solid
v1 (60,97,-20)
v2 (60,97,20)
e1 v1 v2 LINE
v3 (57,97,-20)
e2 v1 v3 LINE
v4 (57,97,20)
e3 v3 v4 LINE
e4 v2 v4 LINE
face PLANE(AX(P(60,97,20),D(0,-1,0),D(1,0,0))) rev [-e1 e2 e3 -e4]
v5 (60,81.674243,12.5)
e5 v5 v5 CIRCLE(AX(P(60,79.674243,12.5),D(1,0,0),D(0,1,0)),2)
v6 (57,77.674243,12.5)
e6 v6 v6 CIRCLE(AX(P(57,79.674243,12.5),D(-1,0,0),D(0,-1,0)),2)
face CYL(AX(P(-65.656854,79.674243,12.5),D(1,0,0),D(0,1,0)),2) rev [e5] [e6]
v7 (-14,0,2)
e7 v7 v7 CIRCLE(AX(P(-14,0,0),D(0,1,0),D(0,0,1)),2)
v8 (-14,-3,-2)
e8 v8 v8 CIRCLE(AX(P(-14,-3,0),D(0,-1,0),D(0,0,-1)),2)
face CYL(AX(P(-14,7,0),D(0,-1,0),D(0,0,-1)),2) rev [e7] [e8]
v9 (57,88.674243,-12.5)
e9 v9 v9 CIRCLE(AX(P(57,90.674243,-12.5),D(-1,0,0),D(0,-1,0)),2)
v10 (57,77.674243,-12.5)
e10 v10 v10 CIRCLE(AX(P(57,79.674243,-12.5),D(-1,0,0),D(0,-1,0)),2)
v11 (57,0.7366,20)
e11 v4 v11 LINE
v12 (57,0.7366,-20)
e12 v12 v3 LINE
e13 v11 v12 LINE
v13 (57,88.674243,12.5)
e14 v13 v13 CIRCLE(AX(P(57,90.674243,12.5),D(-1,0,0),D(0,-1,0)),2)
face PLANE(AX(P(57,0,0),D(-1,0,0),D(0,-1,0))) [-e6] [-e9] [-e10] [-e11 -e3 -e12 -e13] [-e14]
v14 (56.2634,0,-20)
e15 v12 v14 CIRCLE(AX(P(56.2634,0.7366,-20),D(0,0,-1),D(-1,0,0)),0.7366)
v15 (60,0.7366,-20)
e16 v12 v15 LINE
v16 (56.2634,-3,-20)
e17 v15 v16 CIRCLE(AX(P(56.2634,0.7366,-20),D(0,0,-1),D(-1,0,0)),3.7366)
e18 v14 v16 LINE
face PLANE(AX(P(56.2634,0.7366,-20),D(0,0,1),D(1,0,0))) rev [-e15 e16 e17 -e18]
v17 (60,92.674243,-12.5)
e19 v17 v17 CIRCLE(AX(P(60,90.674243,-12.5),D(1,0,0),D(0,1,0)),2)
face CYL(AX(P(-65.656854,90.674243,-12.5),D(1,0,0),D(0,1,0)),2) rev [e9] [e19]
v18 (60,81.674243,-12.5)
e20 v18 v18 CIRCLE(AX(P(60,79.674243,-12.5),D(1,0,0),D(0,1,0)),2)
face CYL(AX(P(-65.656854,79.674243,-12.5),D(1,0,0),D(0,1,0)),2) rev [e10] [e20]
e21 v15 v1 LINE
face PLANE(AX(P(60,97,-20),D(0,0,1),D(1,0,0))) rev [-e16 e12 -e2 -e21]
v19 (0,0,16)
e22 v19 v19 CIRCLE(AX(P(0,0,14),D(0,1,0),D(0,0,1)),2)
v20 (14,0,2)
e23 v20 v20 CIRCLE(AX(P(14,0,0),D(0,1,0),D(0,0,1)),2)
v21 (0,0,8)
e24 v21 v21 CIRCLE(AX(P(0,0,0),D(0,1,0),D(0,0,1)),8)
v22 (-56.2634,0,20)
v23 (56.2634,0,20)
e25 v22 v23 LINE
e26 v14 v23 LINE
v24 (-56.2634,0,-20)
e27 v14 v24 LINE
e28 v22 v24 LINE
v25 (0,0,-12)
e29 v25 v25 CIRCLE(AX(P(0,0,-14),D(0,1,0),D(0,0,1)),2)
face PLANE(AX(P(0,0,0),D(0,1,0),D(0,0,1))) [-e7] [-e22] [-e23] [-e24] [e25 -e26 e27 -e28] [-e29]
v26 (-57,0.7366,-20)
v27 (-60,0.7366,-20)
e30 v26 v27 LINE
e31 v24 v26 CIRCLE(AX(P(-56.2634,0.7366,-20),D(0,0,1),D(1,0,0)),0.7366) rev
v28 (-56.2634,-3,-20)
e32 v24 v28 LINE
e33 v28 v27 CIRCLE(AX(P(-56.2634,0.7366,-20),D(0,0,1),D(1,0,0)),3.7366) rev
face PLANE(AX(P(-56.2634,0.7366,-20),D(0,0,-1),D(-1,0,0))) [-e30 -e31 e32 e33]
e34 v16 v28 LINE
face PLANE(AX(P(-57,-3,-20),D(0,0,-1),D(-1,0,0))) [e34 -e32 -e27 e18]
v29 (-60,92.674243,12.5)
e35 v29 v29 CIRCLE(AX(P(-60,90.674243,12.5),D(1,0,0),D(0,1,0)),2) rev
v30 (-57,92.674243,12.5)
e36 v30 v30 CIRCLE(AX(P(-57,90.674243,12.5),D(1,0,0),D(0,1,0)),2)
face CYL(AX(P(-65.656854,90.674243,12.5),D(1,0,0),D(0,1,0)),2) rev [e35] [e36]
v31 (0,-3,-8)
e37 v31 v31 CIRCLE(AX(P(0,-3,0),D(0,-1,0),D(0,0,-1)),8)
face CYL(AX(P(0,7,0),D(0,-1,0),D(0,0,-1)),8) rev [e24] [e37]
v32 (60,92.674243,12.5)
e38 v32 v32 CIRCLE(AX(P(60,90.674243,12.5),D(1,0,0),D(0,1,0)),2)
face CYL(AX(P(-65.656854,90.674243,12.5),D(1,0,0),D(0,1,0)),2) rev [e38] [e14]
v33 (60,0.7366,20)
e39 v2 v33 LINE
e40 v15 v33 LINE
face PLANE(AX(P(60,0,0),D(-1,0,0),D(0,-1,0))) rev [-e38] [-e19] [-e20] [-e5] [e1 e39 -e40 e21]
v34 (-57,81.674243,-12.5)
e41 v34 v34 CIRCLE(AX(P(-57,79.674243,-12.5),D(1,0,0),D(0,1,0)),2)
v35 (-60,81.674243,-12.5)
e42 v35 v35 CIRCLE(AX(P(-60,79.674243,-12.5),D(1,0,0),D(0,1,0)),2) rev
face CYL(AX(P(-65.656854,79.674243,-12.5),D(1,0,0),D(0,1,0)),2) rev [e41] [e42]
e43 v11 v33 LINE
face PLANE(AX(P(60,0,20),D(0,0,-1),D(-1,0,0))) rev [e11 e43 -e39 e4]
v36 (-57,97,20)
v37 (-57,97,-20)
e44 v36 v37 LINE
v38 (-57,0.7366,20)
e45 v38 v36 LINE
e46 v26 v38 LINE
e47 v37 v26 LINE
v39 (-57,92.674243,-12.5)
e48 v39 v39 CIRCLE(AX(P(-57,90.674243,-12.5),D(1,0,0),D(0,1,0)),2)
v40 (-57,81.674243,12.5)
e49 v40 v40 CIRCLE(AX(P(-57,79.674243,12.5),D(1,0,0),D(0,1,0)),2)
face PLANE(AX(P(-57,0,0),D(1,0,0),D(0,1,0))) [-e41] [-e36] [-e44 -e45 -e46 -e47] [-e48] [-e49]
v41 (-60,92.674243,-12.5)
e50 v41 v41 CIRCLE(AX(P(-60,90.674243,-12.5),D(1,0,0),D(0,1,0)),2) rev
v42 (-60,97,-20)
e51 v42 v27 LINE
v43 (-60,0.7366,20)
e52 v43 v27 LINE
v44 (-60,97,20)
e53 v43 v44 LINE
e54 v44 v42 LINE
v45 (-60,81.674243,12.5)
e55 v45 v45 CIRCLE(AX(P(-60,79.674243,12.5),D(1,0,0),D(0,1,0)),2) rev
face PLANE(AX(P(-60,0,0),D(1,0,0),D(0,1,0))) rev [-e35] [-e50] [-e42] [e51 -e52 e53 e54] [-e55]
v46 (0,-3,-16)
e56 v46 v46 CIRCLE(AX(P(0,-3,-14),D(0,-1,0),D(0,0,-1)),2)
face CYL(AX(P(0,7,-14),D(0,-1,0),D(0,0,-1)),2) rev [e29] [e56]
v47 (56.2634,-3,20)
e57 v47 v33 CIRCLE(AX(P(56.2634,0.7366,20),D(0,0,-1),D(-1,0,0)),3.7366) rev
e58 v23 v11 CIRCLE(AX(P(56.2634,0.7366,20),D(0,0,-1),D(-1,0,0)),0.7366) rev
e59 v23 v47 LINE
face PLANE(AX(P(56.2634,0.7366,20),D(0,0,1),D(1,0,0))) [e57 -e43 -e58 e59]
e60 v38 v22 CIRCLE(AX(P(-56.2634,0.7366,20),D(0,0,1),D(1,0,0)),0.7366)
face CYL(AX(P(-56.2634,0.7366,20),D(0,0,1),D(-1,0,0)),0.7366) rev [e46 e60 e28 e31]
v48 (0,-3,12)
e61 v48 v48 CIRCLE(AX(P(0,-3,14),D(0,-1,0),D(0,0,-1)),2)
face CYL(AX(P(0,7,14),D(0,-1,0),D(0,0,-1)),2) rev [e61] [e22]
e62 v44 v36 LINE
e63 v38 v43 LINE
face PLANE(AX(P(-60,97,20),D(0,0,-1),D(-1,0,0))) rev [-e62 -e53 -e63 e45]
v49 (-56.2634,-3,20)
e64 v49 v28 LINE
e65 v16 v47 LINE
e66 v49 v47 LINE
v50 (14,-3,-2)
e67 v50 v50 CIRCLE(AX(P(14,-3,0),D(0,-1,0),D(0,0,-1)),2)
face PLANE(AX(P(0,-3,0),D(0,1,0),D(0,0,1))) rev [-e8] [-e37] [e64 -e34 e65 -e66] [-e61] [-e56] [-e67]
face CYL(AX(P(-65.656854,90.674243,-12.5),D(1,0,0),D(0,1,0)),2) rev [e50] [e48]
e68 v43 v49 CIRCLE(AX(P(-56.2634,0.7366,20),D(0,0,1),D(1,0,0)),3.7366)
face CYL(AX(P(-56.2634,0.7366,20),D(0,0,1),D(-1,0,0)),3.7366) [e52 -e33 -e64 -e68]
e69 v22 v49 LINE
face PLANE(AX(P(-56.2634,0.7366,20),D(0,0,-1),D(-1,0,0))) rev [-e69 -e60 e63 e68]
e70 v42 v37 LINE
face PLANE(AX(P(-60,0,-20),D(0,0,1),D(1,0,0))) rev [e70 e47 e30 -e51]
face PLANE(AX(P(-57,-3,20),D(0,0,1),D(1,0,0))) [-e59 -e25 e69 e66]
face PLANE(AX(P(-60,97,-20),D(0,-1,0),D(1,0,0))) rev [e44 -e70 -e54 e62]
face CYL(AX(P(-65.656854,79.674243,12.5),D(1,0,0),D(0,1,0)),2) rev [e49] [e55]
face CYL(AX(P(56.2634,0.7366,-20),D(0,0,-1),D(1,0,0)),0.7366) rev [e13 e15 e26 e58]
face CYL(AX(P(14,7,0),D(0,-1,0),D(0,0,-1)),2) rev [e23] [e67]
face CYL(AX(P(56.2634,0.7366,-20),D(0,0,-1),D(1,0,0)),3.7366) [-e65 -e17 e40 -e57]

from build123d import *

# Parameters (mm, degrees)
SKETCH3_W                    = 114
SKETCH3_H                    = 40
BASE_FLANGE1_DEPTH           = 3
EDGE_FLANGE1_STRIP_W         = 13.4732
EDGE_FLANGE1_STRIP_H         = 3
EDGE_FLANGE1_STRIP_CUT_DEPTH = 40
EDGE_FLANGE1_DEPTH           = 40
EDGE_FLANGE2_STRIP_W         = 13.4732
EDGE_FLANGE2_STRIP_H         = 3
EDGE_FLANGE2_STRIP_CUT_DEPTH = 40
EDGE_FLANGE2_DEPTH           = 40
SKETCH11_R                   = 8
SKETCH11_R_2                 = 2
CUT_EXTRUDE1_DEPTH           = 10
CUT_EXTRUDE2_REACH           = 157.592
SKETCH12_R                   = 2


# Sheet-metal steps are written as plain solids
with BuildPart() as part:
    # Sketch3 → Base-Flange1 (new body)
    with BuildSketch(Plane(origin=(0, 0, 0), x_dir=(1, 0, 0), z_dir=(0, 1, 0))):
        Rectangle(SKETCH3_W, SKETCH3_H)
    extrude(amount=-BASE_FLANGE1_DEPTH)

    # Edge-Flange1 strip (across the edge) → Edge-Flange1 strip cut (cut)
    with BuildSketch(Plane(origin=(-57, 0, -20), x_dir=(1, 0, 0), z_dir=(0, 0, 1))):
        with Locations((-6, -1.5)):
            Rectangle(EDGE_FLANGE1_STRIP_W, EDGE_FLANGE1_STRIP_H)
    extrude(amount=EDGE_FLANGE1_STRIP_CUT_DEPTH, mode=Mode.SUBTRACT)

    # Edge-Flange1 section (across the edge) → Edge-Flange1 (add)
    with BuildSketch(Plane(origin=(-57, 0, -20), x_dir=(1, 0, 0), z_dir=(0, 0, 1))):
        with BuildLine():
            Line((-3, 0.7366), (-3, 97))
            Line((-3, 97), (0, 97))
            Line((0, 97), (0, 0.7366))
            ThreePointArc((0, 0.7366), (0.215745145, 0.215745145), (0.7366, 0))
            Line((0.7366, 0), (0.7366, -3))
            ThreePointArc((0.7366, -3), (-1.905575199, -1.905575199), (-3, 0.7366))
        make_face()
    extrude(amount=EDGE_FLANGE1_DEPTH)

    # Edge-Flange2 strip (across the edge) → Edge-Flange2 strip cut (cut)
    with BuildSketch(Plane(origin=(57, 0, 20), x_dir=(-1, 0, 0), z_dir=(0, 0, -1))):
        with Locations((-6, -1.5)):
            Rectangle(EDGE_FLANGE2_STRIP_W, EDGE_FLANGE2_STRIP_H)
    extrude(amount=EDGE_FLANGE2_STRIP_CUT_DEPTH, mode=Mode.SUBTRACT)

    # Edge-Flange2 section (across the edge) → Edge-Flange2 (add)
    with BuildSketch(Plane(origin=(57, 0, 20), x_dir=(-1, 0, 0), z_dir=(0, 0, -1))):
        with BuildLine():
            Line((-3, 0.7366), (-3, 97))
            Line((-3, 97), (0, 97))
            Line((0, 97), (0, 0.7366))
            ThreePointArc((0, 0.7366), (0.215745145, 0.215745145), (0.7366, 0))
            Line((0.7366, 0), (0.7366, -3))
            ThreePointArc((0.7366, -3), (-1.905575199, -1.905575199), (-3, 0.7366))
        make_face()
    extrude(amount=EDGE_FLANGE2_DEPTH)

    # Sketch11 → Cut-Extrude1 (cut)
    with BuildSketch(Plane(origin=(0, -3, 0), x_dir=(-1, 0, 0), z_dir=(0, -1, 0))):
        with Locations(Location((0, 0, 0), (0, 0, 90))):
            Circle(SKETCH11_R)
        with Locations(Location((0, 14, 0), (0, 0, 90))):
            Circle(SKETCH11_R_2)
        with Locations(Location((14, 0, 0), (0, 0, 90))):
            Circle(SKETCH11_R_2)
        with Locations(Location((0, -14, 0), (0, 0, 90))):
            Circle(SKETCH11_R_2)
        with Locations(Location((-14, 0, 0), (0, 0, 90))):
            Circle(SKETCH11_R_2)
    extrude(amount=-CUT_EXTRUDE1_DEPTH, mode=Mode.SUBTRACT)

    # Cut-Extrude2: up to this face of the body (flat: up to its plane)
    cut_extrude2_end = Plane(part.part.faces().sort_by_distance((-60, 48.8683, 0))[0])
    # Sketch12 → Cut-Extrude2 (cut, up to the picked face)
    with BuildSketch(Plane(origin=(60, 0, 0), x_dir=(0, 0, -1), z_dir=(1, 0, 0)), mode=Mode.PRIVATE) as cut_extrude2_sk1:
        with Locations(Location((12.5, 79.674243403, 0), (0, 0, 90))):
            Circle(SKETCH12_R)
    cut_extrude2_tool1 = split(extrude(cut_extrude2_sk1.sketch, amount=-CUT_EXTRUDE2_REACH, mode=Mode.PRIVATE), bisect_by=cut_extrude2_end, keep=Keep.BOTH, mode=Mode.PRIVATE)
    # Sketch12 → Cut-Extrude2 (cut, up to the picked face)
    with BuildSketch(Plane(origin=(60, 0, 0), x_dir=(0, 0, -1), z_dir=(1, 0, 0)), mode=Mode.PRIVATE) as cut_extrude2_sk2:
        with Locations(Location((12.5, 90.674243403, 0), (0, 0, 90))):
            Circle(SKETCH12_R)
    cut_extrude2_tool2 = split(extrude(cut_extrude2_sk2.sketch, amount=-CUT_EXTRUDE2_REACH, mode=Mode.PRIVATE), bisect_by=cut_extrude2_end, keep=Keep.BOTH, mode=Mode.PRIVATE)
    # Sketch12 → Cut-Extrude2 (cut, up to the picked face)
    with BuildSketch(Plane(origin=(60, 0, 0), x_dir=(0, 0, -1), z_dir=(1, 0, 0)), mode=Mode.PRIVATE) as cut_extrude2_sk3:
        with Locations(Location((-12.5, 79.674243403, 0), (0, 0, 90))):
            Circle(SKETCH12_R)
    cut_extrude2_tool3 = split(extrude(cut_extrude2_sk3.sketch, amount=-CUT_EXTRUDE2_REACH, mode=Mode.PRIVATE), bisect_by=cut_extrude2_end, keep=Keep.BOTH, mode=Mode.PRIVATE)
    # Sketch12 → Cut-Extrude2 (cut, up to the picked face)
    with BuildSketch(Plane(origin=(60, 0, 0), x_dir=(0, 0, -1), z_dir=(1, 0, 0)), mode=Mode.PRIVATE) as cut_extrude2_sk4:
        with Locations(Location((-12.5, 90.674243403, 0), (0, 0, 90))):
            Circle(SKETCH12_R)
    cut_extrude2_tool4 = split(extrude(cut_extrude2_sk4.sketch, amount=-CUT_EXTRUDE2_REACH, mode=Mode.PRIVATE), bisect_by=cut_extrude2_end, keep=Keep.BOTH, mode=Mode.PRIVATE)
    add(cut_extrude2_tool1.solids().sort_by(Axis((60, 79.674243, -12.5), (-1, 0, 0)))[0], mode=Mode.SUBTRACT)
    add(cut_extrude2_tool2.solids().sort_by(Axis((60, 90.674243, -12.5), (-1, 0, 0)))[0], mode=Mode.SUBTRACT)
    add(cut_extrude2_tool3.solids().sort_by(Axis((60, 79.674243, 12.5), (-1, 0, 0)))[0], mode=Mode.SUBTRACT)
    add(cut_extrude2_tool4.solids().sort_by(Axis((60, 90.674243, 12.5), (-1, 0, 0)))[0], mode=Mode.SUBTRACT)


solid = part.part
